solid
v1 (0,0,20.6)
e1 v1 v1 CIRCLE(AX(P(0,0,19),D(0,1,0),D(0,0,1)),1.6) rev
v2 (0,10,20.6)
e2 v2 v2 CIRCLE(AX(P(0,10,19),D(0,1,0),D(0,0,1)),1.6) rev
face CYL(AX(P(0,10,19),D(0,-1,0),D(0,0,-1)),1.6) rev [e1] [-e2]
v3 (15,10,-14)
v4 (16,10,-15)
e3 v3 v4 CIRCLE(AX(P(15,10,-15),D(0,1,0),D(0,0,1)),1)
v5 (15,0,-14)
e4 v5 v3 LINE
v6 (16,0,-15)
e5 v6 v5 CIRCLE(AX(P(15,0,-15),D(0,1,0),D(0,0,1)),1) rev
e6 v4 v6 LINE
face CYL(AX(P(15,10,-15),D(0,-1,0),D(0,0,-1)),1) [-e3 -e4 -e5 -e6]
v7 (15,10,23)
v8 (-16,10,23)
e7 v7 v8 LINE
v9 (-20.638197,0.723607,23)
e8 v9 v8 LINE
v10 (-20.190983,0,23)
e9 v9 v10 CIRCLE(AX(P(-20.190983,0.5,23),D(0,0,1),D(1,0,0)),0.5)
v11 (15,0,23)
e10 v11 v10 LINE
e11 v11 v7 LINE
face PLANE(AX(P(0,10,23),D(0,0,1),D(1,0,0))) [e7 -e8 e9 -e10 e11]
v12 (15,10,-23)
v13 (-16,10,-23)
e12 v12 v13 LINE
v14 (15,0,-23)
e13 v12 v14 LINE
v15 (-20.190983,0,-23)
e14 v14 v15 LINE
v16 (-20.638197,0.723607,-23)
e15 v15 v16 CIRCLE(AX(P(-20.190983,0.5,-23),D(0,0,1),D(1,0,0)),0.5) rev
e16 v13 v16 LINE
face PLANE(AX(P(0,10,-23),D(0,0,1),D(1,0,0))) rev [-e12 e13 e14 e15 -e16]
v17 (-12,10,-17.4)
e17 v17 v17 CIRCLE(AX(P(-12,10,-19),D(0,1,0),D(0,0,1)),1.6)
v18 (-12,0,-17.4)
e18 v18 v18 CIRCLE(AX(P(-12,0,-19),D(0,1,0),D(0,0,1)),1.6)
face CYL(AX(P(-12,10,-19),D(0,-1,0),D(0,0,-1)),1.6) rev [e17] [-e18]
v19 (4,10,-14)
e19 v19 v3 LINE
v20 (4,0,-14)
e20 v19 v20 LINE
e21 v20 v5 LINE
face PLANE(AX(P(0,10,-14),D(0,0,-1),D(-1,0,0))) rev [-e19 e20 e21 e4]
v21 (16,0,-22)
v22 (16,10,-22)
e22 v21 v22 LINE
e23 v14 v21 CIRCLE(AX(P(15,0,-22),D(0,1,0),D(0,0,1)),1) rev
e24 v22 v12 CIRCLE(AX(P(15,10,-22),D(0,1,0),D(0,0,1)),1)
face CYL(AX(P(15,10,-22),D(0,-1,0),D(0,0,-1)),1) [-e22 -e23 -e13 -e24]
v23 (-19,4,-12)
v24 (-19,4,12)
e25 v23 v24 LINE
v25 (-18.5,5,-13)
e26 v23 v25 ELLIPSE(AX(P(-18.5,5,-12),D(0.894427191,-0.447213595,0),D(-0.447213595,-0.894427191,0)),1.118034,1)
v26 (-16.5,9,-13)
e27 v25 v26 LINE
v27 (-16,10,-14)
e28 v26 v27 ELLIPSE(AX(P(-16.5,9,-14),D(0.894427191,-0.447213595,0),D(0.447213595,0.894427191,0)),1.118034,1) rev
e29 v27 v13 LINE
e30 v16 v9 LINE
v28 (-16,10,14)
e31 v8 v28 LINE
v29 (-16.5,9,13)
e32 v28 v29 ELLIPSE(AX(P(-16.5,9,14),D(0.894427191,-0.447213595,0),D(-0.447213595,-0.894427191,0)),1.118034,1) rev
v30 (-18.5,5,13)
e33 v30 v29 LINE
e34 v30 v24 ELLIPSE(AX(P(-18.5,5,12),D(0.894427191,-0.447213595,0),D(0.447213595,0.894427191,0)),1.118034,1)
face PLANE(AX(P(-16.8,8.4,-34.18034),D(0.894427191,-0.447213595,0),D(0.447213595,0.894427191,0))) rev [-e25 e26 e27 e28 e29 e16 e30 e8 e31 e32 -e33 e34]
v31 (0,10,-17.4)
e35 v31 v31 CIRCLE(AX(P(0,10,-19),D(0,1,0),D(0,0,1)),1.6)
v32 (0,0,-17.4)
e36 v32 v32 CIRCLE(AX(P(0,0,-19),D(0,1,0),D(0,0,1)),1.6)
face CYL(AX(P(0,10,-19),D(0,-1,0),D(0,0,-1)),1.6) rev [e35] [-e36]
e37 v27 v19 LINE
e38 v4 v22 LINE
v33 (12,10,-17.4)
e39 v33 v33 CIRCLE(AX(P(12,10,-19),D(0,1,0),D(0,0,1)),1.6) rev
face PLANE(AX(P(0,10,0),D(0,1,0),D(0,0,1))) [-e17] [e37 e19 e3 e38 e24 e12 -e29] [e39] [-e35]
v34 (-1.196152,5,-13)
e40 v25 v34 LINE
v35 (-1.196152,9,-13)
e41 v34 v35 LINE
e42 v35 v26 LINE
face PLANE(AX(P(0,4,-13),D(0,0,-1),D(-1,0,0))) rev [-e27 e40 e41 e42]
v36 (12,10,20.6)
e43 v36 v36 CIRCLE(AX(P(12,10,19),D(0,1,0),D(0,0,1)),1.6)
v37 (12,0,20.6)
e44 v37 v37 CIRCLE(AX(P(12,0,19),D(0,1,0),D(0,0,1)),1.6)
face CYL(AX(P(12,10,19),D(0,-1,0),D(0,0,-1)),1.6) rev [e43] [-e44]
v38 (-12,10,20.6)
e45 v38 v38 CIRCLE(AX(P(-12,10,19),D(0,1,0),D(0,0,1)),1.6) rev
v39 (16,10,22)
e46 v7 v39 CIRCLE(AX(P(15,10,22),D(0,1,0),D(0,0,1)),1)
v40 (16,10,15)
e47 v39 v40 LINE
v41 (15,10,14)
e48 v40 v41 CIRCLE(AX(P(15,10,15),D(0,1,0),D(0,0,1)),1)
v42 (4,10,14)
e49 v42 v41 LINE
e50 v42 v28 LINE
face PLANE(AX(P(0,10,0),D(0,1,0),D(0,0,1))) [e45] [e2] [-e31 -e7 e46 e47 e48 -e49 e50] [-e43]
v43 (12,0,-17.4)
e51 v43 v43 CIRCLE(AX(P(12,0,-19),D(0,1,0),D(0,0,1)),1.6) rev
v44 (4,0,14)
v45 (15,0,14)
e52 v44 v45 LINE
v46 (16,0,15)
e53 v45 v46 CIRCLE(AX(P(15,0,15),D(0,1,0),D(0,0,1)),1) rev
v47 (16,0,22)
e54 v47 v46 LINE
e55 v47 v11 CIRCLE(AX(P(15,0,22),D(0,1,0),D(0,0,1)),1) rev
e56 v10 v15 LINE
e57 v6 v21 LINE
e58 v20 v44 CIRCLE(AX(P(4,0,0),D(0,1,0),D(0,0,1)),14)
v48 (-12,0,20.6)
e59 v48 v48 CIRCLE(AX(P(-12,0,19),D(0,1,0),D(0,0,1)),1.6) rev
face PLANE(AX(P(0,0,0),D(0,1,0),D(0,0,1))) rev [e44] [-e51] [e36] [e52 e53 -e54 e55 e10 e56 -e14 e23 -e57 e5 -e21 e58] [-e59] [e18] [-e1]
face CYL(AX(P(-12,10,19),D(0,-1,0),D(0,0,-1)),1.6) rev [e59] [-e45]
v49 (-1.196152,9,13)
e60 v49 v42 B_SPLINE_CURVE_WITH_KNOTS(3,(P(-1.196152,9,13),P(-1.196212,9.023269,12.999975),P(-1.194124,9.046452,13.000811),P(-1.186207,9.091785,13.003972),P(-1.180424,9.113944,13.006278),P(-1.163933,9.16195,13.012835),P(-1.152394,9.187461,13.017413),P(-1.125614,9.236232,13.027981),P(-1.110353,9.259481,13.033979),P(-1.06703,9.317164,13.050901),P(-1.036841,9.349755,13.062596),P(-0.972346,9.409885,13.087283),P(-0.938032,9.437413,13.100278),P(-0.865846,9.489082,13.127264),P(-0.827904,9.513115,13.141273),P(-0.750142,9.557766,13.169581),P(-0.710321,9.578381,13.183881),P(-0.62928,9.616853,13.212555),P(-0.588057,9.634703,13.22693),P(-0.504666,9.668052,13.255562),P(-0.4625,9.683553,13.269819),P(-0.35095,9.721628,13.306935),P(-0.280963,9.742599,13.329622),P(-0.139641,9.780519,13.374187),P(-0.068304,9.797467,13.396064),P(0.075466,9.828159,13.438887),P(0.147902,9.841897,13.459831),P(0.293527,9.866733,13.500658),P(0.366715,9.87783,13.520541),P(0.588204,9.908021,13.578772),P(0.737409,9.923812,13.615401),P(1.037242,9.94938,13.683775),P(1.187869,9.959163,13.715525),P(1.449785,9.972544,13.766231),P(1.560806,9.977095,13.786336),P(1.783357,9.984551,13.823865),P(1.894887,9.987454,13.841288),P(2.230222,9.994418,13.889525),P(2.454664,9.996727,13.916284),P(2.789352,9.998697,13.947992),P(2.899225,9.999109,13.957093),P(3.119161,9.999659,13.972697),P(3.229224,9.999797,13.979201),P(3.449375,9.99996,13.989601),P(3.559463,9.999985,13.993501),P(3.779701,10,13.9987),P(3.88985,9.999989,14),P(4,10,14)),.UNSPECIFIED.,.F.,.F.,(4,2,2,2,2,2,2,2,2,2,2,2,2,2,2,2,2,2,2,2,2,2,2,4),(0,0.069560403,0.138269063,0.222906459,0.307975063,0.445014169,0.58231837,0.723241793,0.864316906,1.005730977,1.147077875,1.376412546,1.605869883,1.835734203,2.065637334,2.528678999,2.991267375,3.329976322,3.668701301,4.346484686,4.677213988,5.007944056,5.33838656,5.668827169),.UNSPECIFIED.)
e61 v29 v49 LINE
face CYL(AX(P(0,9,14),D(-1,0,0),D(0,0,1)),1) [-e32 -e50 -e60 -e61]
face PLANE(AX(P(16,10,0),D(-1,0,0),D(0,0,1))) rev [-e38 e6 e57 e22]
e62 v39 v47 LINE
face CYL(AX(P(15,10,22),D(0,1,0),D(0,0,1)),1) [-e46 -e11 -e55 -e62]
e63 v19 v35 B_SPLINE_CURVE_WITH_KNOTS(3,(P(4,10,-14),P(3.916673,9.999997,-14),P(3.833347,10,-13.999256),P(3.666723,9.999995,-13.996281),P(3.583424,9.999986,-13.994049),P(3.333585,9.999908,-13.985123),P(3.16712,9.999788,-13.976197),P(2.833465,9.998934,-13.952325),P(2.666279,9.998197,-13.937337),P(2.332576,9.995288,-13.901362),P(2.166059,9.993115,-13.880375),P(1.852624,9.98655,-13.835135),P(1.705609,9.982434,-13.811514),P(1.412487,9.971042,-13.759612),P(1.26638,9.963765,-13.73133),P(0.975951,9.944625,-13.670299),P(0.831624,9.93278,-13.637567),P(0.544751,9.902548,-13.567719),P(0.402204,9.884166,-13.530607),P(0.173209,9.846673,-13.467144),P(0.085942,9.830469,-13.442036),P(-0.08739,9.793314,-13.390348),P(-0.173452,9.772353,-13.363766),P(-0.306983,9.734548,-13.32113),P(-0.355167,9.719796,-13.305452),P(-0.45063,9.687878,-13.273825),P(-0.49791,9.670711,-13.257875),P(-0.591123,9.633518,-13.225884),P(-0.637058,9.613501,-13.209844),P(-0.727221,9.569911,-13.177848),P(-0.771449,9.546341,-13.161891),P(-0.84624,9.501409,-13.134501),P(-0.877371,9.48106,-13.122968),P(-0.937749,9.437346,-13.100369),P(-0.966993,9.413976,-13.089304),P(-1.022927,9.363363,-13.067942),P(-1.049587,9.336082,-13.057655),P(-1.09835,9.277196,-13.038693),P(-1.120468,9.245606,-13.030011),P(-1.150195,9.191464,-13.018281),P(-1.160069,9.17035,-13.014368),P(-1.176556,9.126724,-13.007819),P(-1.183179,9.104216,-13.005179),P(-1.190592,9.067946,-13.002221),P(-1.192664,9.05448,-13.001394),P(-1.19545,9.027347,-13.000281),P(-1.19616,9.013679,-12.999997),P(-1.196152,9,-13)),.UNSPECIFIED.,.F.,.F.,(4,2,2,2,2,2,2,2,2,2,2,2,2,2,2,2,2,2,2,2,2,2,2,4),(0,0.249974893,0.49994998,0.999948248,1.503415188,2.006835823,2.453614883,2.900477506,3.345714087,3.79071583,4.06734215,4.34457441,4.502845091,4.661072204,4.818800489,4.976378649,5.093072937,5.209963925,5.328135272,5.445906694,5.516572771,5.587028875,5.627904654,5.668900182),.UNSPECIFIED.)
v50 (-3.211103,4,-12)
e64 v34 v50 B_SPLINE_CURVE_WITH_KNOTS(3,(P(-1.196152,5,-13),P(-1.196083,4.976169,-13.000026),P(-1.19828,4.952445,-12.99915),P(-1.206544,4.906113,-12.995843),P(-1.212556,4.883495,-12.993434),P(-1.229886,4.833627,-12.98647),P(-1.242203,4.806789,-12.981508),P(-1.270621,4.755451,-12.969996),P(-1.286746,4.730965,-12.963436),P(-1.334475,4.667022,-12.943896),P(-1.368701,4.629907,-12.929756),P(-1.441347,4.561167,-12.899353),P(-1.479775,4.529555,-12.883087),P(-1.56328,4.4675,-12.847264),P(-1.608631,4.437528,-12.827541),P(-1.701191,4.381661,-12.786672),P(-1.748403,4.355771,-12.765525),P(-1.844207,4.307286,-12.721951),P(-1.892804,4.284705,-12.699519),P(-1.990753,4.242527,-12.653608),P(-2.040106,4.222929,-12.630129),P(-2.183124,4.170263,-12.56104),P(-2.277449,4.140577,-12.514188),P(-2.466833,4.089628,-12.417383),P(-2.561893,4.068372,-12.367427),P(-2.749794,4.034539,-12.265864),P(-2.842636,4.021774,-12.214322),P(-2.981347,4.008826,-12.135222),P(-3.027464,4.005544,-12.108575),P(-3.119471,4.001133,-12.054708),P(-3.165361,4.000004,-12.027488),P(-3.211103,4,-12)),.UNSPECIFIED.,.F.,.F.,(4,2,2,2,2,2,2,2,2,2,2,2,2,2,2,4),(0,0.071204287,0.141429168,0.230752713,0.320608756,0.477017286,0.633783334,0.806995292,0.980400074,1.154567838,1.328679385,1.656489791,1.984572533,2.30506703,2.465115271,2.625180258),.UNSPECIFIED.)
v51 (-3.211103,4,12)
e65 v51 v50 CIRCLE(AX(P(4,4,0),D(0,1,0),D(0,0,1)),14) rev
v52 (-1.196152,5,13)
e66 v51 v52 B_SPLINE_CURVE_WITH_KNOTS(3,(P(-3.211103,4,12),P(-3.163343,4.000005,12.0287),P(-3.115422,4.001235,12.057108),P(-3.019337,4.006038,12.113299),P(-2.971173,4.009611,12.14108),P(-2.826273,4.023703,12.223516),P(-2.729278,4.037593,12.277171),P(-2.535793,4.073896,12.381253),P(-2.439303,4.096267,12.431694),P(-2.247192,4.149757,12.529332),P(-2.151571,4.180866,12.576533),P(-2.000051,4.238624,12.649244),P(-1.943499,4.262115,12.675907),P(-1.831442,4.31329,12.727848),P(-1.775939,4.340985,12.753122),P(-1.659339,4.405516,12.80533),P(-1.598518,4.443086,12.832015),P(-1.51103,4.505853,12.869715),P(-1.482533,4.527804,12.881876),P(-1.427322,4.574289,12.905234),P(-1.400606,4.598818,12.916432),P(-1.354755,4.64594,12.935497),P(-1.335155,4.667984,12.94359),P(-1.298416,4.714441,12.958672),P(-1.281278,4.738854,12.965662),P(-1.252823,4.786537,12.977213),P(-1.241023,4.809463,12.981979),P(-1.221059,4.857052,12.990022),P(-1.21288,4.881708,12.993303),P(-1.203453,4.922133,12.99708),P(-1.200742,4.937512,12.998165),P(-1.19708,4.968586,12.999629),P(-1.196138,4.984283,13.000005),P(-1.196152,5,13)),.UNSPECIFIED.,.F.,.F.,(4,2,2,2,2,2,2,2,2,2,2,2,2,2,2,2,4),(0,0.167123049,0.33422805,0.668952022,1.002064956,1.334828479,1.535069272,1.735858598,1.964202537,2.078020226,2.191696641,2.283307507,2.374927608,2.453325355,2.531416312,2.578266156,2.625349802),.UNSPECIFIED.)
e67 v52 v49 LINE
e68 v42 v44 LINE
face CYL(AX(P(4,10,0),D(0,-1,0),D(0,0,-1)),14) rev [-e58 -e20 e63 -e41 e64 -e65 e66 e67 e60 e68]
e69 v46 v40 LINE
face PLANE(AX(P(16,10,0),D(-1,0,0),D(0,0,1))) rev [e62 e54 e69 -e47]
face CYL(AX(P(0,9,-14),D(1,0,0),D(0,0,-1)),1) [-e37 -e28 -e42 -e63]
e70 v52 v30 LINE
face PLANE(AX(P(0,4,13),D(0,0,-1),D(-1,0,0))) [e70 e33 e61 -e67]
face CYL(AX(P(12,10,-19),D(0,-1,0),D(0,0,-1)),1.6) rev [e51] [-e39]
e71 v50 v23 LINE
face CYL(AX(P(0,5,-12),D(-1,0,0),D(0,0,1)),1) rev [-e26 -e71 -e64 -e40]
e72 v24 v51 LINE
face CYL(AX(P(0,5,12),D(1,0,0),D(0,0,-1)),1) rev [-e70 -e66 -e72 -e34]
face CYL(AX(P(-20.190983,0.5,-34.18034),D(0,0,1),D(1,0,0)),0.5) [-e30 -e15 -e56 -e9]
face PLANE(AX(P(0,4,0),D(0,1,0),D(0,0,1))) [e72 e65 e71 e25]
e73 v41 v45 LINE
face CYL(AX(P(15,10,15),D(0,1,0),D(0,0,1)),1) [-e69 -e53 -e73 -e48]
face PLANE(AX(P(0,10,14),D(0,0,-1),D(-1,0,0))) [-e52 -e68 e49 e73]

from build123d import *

# Parameters (mm, degrees)
SKETCH2_R           = 1.6
BOSS_EXTRUDE1_DEPTH = 10
BOSS_EXTRUDE2_DEPTH = 46
CUT_EXTRUDE1_START  = -6
SKETCH5_W           = 5
SKETCH5_H           = 13
CUT_EXTRUDE1_DEPTH  = 6
FILLET1_R           = 1
FILLET2_R           = 0.5
FILLET3_R           = 1


with BuildPart() as part:
    # Sketch2 → Boss-Extrude1 (new body)
    with BuildSketch(Plane(origin=(0, 0, 0), x_dir=(1, 0, 0), z_dir=(0, 1, 0))):
        with BuildLine():
            ThreePointArc((-10, 0), (-7.22497216, 8.366600265), (0, 13.416407865))
            ThreePointArc((0, 13.416407865), (1.97882585, 13.853333716), (4, 14))
            Line((4, 14), (16, 14))
            Line((16, 14), (16, 23))
            Line((16, 23), (-16, 23))
            Line((-16, 23), (-16, -23))
            Line((-16, -23), (16, -23))
            Line((16, -23), (16, -14))
            Line((16, -14), (4, -14))
            ThreePointArc((4, -14), (-5.899494937, -9.899494937), (-10, 0))
        make_face()
        with Locations(Location((-12, -19, 0), (0, 0, 270))):
            Circle(SKETCH2_R, mode=Mode.SUBTRACT)
        with Locations(Location((0, -19, 0), (0, 0, 270))):
            Circle(SKETCH2_R, mode=Mode.SUBTRACT)
        with Locations(Location((12, -19, 0), (0, 0, 270))):
            Circle(SKETCH2_R, mode=Mode.SUBTRACT)
        with BuildLine():
            ThreePointArc((-10.4, 19), (-10.86862915, 17.86862915), (-12, 17.4))
            ThreePointArc((-12, 17.4), (-13.13137085, 20.13137085), (-10.4, 19))
        make_face(mode=Mode.SUBTRACT)
        with BuildLine():
            ThreePointArc((1.6, 19), (1.13137085, 17.86862915), (0, 17.4))
            ThreePointArc((0, 17.4), (-1.13137085, 20.13137085), (1.6, 19))
        make_face(mode=Mode.SUBTRACT)
        with Locations(Location((12, 19, 0), (0, 0, 270))):
            Circle(SKETCH2_R, mode=Mode.SUBTRACT)
    extrude(amount=BOSS_EXTRUDE1_DEPTH)

    # Sketch4 → Boss-Extrude2 (add)
    with BuildSketch(Plane.XY.offset(23)):
        Polygon((-21, 0), (-16, 10), (-16, 0), align=None)
    extrude(amount=-BOSS_EXTRUDE2_DEPTH)

    # Sketch5 → Cut-Extrude1 (cut)
    with BuildSketch(Plane(origin=(0, 10, 0), x_dir=(1, 0, 0), z_dir=(0, 1, 0)).offset(CUT_EXTRUDE1_START)):
        with BuildLine():
            Line((-16, 0), (-10, 0))
            ThreePointArc((-10, 0), (-7.591939741, 7.850282354), (-1.196152423, 13))
            Line((-1.196152423, 13), (-16, 13))
            Line((-16, 13), (-16, 0))
        make_face()
        with Locations((-18.5, 6.5)):
            Rectangle(SKETCH5_W, SKETCH5_H)
        with BuildLine():
            ThreePointArc((-1.196152423, -13), (-7.591939741, -7.850282354), (-10, 0))
            Line((-10, 0), (-16, 0))
            Line((-16, 0), (-16, -13))
            Line((-16, -13), (-1.196152423, -13))
        make_face()
        with Locations((-18.5, -6.5)):
            Rectangle(SKETCH5_W, SKETCH5_H)
    extrude(amount=CUT_EXTRUDE1_DEPTH, mode=Mode.SUBTRACT)

    # Fillet1
    fillet1_edges = [part.edges().sort_by_distance(p)[0] for p in [
        (-8.598076211, 10, 13),
        (-10.098076211, 4, 13),
        (-10.098076211, 4, -13),
        (-8.598076211, 10, -13),
    ]]
    fillet(fillet1_edges, radius=FILLET1_R - 0.0001)  # a hair under: the kernel refuses the full size

    # Fillet2
    fillet2_edges = [part.edges().sort_by_distance(p)[0] for p in [
        (-21, 0, 0),
    ]]
    fillet(fillet2_edges, radius=FILLET2_R)

    # Fillet3
    fillet3_edges = [part.edges().sort_by_distance(p)[0] for p in [
        (16, 5, 14),
        (16, 5, 23),
        (16, 5, -23),
        (16, 5, -14),
    ]]
    fillet(fillet3_edges, radius=FILLET3_R)


solid = part.part
